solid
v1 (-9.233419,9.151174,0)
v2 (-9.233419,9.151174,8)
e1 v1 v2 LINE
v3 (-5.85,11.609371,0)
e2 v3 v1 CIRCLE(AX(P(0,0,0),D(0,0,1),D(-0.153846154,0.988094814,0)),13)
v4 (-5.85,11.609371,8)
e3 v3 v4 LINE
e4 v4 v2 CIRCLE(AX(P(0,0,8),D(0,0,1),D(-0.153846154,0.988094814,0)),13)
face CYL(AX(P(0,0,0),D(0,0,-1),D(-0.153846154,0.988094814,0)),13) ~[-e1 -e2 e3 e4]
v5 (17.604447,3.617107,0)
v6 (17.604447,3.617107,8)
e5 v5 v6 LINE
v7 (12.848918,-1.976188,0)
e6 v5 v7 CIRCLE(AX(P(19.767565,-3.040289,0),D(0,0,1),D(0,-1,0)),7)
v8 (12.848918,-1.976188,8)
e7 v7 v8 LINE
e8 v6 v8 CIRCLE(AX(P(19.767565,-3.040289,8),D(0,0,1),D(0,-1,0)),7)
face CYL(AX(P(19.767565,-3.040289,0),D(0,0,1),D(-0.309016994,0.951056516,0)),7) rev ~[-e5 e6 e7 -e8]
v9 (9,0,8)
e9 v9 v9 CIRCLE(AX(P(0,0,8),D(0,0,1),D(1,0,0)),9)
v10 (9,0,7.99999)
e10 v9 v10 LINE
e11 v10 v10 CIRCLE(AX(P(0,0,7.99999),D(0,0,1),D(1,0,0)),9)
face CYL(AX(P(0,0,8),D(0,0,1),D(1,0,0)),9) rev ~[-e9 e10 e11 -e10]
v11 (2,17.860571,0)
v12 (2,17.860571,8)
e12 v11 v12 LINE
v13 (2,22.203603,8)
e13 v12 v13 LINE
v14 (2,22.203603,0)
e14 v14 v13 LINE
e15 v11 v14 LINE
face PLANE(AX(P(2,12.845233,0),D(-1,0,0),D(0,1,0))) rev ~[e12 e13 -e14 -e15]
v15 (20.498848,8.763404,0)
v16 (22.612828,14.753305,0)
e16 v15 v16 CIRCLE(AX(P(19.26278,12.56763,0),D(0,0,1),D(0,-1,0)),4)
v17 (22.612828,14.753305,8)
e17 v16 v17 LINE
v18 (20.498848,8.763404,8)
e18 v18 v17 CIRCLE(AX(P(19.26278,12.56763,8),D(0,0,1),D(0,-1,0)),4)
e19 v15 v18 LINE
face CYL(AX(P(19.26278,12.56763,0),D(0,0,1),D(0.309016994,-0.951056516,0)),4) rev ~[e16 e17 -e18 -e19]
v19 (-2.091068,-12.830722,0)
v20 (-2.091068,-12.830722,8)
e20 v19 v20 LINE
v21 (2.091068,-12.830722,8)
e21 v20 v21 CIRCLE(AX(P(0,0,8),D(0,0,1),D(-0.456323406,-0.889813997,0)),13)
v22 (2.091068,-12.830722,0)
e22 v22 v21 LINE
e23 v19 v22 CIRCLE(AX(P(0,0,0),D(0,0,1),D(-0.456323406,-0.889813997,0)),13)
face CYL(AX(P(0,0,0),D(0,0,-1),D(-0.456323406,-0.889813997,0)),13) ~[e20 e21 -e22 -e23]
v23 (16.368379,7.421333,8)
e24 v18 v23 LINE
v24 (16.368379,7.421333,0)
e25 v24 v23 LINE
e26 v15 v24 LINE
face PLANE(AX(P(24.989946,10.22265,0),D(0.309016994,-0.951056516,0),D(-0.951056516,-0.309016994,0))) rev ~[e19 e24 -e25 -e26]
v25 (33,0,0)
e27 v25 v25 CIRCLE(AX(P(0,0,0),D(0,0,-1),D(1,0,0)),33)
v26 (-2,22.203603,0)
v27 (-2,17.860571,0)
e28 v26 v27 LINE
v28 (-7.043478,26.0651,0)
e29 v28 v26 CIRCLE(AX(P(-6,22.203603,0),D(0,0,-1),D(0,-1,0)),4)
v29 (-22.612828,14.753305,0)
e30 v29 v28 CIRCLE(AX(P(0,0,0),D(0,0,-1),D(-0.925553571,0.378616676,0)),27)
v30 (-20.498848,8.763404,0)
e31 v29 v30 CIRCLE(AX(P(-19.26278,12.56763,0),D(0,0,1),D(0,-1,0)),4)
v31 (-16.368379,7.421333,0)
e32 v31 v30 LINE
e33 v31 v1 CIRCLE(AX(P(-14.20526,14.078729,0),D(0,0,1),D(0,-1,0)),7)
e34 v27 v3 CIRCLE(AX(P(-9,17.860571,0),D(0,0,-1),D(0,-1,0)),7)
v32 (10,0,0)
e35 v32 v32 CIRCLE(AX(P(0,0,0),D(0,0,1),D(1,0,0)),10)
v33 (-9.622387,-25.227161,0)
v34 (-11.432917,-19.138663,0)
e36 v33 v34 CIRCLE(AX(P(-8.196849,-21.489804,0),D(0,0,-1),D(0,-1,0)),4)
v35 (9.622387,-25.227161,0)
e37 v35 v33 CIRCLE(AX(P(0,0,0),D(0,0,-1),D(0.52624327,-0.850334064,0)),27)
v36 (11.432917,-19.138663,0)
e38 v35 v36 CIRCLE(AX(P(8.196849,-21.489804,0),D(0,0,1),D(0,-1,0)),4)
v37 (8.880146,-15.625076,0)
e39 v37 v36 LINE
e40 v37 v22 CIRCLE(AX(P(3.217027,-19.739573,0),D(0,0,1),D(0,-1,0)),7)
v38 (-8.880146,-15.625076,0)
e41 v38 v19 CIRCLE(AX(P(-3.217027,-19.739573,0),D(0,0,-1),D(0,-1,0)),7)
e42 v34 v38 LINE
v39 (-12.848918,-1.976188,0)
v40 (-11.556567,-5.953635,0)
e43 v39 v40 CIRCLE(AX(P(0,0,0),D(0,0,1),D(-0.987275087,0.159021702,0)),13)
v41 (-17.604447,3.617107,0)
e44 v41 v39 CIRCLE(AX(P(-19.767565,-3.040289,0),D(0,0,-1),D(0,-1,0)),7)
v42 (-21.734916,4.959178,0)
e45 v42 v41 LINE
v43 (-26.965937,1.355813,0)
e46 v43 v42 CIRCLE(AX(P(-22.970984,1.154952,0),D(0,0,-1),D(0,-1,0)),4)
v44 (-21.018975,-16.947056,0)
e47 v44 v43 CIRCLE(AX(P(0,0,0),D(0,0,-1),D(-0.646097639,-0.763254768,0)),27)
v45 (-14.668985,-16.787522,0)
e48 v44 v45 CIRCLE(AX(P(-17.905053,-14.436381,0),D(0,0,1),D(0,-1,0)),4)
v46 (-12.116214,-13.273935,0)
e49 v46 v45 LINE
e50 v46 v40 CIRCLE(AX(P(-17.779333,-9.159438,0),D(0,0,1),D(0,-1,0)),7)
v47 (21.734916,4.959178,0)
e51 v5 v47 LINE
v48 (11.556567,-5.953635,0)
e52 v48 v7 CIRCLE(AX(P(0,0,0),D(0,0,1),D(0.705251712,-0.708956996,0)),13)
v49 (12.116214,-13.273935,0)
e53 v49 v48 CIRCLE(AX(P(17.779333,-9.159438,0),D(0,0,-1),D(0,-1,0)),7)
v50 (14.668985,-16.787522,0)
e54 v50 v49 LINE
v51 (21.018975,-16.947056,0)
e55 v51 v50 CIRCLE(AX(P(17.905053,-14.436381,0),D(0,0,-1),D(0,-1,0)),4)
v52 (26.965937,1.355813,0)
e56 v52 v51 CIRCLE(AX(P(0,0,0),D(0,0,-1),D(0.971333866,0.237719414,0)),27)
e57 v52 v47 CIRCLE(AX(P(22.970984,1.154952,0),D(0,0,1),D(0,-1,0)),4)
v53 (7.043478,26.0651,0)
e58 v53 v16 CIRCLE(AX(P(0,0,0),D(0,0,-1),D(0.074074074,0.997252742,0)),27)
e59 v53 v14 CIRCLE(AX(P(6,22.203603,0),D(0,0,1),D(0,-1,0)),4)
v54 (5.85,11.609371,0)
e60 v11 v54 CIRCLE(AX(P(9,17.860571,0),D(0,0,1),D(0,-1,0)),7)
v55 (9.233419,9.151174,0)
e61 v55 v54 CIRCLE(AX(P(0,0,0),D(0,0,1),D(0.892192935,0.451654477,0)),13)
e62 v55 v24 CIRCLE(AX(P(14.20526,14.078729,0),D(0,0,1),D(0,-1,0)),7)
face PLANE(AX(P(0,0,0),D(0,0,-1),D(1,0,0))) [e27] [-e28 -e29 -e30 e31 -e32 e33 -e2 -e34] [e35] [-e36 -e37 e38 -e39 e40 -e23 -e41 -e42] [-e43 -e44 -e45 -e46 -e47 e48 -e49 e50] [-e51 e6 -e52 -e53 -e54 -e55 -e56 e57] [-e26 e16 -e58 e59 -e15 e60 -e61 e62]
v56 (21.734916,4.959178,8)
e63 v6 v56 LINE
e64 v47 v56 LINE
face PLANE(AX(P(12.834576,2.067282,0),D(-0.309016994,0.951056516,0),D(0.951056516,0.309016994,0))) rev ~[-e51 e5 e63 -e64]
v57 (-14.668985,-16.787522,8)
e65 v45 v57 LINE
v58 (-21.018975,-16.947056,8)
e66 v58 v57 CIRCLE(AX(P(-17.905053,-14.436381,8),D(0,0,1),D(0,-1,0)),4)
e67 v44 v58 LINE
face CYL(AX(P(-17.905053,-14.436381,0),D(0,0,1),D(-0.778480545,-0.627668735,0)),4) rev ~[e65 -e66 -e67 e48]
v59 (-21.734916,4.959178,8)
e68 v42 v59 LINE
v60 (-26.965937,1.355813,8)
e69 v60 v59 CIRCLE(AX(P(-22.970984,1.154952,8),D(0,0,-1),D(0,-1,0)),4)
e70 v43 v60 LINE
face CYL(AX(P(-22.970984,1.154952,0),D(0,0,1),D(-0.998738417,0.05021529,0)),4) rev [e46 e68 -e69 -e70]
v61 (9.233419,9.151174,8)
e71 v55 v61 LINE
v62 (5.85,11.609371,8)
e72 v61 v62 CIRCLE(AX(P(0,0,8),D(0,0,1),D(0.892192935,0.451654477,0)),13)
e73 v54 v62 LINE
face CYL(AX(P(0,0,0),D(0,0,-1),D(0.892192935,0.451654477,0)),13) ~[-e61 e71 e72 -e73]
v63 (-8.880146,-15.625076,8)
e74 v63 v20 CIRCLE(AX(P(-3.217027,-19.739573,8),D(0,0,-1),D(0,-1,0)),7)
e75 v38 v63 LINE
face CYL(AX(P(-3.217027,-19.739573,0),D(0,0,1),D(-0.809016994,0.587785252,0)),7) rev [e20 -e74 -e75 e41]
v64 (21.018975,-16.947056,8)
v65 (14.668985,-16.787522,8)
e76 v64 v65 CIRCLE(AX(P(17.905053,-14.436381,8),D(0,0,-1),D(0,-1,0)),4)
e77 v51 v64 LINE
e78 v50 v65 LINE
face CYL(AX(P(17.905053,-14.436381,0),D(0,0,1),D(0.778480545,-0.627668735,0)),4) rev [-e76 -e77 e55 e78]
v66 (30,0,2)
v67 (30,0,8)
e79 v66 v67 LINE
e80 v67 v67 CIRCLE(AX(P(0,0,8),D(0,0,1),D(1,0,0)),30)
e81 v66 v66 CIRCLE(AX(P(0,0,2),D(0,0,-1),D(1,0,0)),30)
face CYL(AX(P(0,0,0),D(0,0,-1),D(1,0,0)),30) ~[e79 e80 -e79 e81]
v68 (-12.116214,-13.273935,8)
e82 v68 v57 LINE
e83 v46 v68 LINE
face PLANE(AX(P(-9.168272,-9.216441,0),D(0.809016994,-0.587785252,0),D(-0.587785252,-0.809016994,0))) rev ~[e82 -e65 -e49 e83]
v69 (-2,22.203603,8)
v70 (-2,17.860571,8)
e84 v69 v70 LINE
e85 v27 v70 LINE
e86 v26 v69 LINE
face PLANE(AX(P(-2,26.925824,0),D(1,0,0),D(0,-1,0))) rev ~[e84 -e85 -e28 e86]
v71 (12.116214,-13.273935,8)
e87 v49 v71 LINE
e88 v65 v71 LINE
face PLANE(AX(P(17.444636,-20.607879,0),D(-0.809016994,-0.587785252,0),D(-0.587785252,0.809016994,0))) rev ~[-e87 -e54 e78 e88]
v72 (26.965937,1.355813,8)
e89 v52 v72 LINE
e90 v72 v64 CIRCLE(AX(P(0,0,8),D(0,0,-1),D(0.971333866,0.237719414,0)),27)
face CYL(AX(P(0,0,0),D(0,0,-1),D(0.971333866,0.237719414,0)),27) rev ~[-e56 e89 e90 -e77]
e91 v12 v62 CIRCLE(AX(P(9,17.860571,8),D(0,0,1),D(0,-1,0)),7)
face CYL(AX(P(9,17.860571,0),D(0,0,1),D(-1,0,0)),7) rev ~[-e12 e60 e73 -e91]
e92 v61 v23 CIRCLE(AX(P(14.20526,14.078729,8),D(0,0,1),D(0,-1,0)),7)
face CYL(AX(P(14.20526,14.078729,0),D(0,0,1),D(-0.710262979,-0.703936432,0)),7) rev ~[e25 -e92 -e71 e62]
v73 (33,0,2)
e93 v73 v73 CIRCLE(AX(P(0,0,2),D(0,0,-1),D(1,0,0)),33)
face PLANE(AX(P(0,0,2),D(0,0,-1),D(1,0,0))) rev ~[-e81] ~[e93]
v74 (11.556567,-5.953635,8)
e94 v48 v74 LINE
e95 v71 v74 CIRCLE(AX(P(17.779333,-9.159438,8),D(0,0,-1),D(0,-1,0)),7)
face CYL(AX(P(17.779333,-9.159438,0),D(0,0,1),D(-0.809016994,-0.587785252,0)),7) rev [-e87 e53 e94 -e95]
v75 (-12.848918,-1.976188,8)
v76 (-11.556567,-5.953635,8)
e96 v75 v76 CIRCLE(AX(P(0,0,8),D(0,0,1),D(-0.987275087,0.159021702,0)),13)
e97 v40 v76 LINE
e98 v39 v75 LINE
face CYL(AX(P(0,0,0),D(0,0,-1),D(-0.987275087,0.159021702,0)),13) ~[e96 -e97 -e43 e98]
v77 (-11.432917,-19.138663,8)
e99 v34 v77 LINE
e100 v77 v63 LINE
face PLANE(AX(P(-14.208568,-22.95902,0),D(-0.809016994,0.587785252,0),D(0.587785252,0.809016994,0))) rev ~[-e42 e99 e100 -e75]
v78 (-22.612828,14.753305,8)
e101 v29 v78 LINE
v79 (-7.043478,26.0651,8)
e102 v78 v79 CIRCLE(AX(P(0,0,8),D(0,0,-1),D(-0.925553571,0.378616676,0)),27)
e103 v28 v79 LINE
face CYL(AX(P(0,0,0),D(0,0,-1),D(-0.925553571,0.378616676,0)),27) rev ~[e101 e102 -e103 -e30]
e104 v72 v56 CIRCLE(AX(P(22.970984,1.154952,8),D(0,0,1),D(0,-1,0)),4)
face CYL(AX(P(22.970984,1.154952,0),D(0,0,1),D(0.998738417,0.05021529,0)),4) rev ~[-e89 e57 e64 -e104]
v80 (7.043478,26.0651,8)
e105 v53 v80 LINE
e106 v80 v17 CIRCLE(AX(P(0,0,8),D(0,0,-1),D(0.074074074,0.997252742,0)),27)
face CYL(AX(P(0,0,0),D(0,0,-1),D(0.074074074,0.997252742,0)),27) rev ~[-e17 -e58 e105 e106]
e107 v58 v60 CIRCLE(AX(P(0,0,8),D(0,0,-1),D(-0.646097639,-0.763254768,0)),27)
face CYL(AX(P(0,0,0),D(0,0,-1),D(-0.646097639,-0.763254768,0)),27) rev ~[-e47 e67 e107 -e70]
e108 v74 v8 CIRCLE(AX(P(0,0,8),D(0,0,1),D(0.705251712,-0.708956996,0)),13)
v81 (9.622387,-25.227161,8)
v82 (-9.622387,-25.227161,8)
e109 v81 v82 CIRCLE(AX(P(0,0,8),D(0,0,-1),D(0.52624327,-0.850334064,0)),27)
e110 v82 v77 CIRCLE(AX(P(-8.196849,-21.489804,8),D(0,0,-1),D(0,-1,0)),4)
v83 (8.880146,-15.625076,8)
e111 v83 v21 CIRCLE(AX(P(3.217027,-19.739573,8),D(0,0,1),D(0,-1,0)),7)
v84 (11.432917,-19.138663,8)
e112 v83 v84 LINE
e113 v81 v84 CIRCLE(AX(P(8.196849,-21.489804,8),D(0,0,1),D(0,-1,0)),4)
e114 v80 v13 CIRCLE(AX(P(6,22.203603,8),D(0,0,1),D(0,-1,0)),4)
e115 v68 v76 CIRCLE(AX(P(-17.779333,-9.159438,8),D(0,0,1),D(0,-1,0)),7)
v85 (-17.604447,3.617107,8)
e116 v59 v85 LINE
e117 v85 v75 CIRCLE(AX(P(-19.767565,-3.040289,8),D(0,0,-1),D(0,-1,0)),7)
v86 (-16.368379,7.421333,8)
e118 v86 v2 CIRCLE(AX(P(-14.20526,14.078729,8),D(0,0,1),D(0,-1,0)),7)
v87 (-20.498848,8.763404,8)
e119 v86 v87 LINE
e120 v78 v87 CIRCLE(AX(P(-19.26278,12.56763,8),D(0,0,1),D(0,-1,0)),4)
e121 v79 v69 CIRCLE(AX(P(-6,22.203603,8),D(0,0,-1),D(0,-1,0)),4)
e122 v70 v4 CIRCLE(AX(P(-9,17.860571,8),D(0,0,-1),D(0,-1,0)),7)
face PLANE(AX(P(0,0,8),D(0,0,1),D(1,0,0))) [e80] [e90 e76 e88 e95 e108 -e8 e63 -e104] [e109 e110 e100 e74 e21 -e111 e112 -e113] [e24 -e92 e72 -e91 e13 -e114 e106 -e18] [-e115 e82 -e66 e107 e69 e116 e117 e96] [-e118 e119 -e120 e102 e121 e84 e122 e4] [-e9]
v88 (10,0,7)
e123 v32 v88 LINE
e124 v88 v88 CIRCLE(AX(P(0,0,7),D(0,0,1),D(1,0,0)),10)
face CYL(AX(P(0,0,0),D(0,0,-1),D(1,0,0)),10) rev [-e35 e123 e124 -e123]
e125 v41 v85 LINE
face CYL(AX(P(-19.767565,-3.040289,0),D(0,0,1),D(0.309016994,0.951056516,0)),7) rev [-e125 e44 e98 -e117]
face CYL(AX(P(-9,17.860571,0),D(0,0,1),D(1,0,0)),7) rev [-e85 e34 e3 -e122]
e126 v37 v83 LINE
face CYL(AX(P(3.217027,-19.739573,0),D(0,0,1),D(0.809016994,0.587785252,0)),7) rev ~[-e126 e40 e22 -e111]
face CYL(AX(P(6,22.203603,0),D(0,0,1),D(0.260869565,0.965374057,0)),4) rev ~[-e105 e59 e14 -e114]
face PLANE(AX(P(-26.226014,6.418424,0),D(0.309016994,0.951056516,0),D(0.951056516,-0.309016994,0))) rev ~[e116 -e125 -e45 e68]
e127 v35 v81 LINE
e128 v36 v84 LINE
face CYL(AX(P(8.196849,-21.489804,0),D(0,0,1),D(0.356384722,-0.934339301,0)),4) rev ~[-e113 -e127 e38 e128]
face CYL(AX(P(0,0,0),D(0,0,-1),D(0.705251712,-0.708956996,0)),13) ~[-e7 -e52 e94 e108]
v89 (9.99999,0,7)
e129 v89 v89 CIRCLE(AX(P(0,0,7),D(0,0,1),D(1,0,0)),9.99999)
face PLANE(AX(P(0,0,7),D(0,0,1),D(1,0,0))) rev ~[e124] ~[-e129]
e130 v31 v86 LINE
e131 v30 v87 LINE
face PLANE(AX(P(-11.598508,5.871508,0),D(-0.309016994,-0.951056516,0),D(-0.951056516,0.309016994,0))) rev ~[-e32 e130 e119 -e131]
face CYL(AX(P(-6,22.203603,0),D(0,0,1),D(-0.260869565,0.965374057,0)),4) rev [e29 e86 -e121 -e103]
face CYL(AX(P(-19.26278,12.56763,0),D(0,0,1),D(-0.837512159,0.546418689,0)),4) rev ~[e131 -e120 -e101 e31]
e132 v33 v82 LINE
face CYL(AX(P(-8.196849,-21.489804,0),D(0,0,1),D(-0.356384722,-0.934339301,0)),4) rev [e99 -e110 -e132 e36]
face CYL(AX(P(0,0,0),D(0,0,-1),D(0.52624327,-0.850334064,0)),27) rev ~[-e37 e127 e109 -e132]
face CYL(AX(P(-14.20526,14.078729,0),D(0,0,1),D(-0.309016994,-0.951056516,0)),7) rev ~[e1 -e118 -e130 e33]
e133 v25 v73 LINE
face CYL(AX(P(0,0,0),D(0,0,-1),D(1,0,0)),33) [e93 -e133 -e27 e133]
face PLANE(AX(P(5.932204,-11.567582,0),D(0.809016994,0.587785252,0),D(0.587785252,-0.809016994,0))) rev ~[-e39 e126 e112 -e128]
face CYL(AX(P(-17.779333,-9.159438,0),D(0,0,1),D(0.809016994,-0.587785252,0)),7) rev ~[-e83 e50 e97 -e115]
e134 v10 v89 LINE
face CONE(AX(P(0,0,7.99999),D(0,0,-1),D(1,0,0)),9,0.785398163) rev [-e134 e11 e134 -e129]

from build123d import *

# Parameters (mm, degrees)
F0_R     = 30
F0_R_2   = 10
F1_DEPTH = 8
F2_R     = 33
F2_R_2   = 30
F3_DEPTH = 2
F4_R     = 10
F4_R_2   = 9
F5_DEPTH = 1
F6_R     = 4
F7_R     = 7
F8_SIZE  = 0.99999


# Not quite as in the source:
# - a fillet or chamfer is up to 0.001 mm smaller than in the source, because OpenCascade refuses the exact size


with BuildPart() as f1:
    # F0 (on Top) → F1 (new body)
    with BuildSketch(Plane.XY):
        Circle(F0_R)
        with BuildLine():
            Line((-14.2085682852, -22.959019737), (-5.9322042833, -11.5675819574))
            ThreePointArc((-5.9322042833, -11.5675819574), (0, -13), (5.9322042833, -11.5675819574))
            Line((5.9322042833, -11.5675819574), (14.2085682852, -22.959019737))
            ThreePointArc((14.2085682852, -22.959019737), (0, -27), (-14.2085682852, -22.959019737))
        make_face(mode=Mode.SUBTRACT)
        with BuildLine():
            Line((-26.2260143945, 6.418424182), (-12.834576136, 2.0672821309))
            ThreePointArc((-12.834576136, 2.0672821309), (-12.3637347118, -4.0172209269), (-9.1682722608, -9.2164409483))
            Line((-9.1682722608, -9.2164409483), (-17.4446362627, -20.6078787278))
            ThreePointArc((-17.4446362627, -20.6078787278), (-25.67852594, -8.3434588481), (-26.2260143945, 6.418424182))
        make_face(mode=Mode.SUBTRACT)
        with BuildLine():
            Line((17.4446362627, -20.6078787278), (9.1682722608, -9.2164409483))
            ThreePointArc((9.1682722608, -9.2164409483), (12.3637347118, -4.0172209269), (12.834576136, 2.0672821309))
            Line((12.834576136, 2.0672821309), (26.2260143945, 6.418424182))
            ThreePointArc((26.2260143945, 6.418424182), (25.67852594, -8.3434588481), (17.4446362627, -20.6078787278))
        make_face(mode=Mode.SUBTRACT)
        with BuildLine():
            Line((-2, 26.9258240357), (-2, 12.8452325787))
            ThreePointArc((-2, 12.8452325787), (-7.6412082798, 10.5172209269), (-11.5985081585, 5.8715081961))
            Line((-11.5985081585, 5.8715081961), (-24.989946417, 10.2226502472))
            ThreePointArc((-24.989946417, 10.2226502472), (-15.8702018119, 21.8434588481), (-2, 26.9258240357))
        make_face(mode=Mode.SUBTRACT)
        Circle(F0_R_2, mode=Mode.SUBTRACT)
        with BuildLine():
            ThreePointArc((11.5985081585, 5.8715081961), (7.6412082798, 10.5172209269), (2, 12.8452325787))
            Line((2, 12.8452325787), (2, 26.9258240357))
            ThreePointArc((2, 26.9258240357), (15.8702018119, 21.8434588481), (24.989946417, 10.2226502472))
            Line((24.989946417, 10.2226502472), (11.5985081585, 5.8715081961))
        make_face(mode=Mode.SUBTRACT)
    extrude(amount=F1_DEPTH)

    # F2 (on face) → F3 (join)
    with BuildSketch(Plane(origin=(0, 0, 0), x_dir=(1, 0, 0), z_dir=(0, 0, -1))):
        Circle(F2_R)
        Circle(F2_R_2, mode=Mode.SUBTRACT)
    extrude(amount=-F3_DEPTH)

    # F4 (on face) → F5 (join)
    with BuildSketch(Plane.XY.offset(8)):
        Circle(F4_R)
        Circle(F4_R_2, mode=Mode.SUBTRACT)
    extrude(amount=-F5_DEPTH)

    # F6
    f6_edges = [f1.edges().sort_by_distance(p)[0] for p in [
        (-26.226014, 6.418424, 4),
        (-24.989946, 10.22265, 4),
        (-17.444636, -20.607879, 4),
        (17.444636, -20.607879, 4),
        (26.226014, 6.418424, 4),
        (-2, 26.925824, 4),
        (-14.208568, -22.95902, 4),
        (14.208568, -22.95902, 4),
        (24.989946, 10.22265, 4),
        (2, 26.925824, 4),
    ]]
    fillet(f6_edges, radius=F6_R)

    # F7
    f7_edges = [f1.edges().sort_by_distance(p)[0] for p in [
        (-12.834576, 2.067282, 4),
        (-9.168272, -9.216441, 4),
        (-5.932204, -11.567582, 4),
        (5.932204, -11.567582, 4),
        (9.168272, -9.216441, 4),
        (12.834576, 2.067282, 4),
        (11.598508, 5.871508, 4),
        (2, 12.845233, 4),
        (-2, 12.845233, 4),
        (-11.598508, 5.871508, 4),
    ]]
    fillet(f7_edges, radius=F7_R)

    # F8 (size 1 in the source; OpenCascade refuses exactly that, so slightly less here)
    f8_edges = [f1.edges().sort_by_distance(p)[0] for p in [
        (-9, 0, 7),
    ]]
    chamfer(f8_edges, length=F8_SIZE)


solid = f1.part
